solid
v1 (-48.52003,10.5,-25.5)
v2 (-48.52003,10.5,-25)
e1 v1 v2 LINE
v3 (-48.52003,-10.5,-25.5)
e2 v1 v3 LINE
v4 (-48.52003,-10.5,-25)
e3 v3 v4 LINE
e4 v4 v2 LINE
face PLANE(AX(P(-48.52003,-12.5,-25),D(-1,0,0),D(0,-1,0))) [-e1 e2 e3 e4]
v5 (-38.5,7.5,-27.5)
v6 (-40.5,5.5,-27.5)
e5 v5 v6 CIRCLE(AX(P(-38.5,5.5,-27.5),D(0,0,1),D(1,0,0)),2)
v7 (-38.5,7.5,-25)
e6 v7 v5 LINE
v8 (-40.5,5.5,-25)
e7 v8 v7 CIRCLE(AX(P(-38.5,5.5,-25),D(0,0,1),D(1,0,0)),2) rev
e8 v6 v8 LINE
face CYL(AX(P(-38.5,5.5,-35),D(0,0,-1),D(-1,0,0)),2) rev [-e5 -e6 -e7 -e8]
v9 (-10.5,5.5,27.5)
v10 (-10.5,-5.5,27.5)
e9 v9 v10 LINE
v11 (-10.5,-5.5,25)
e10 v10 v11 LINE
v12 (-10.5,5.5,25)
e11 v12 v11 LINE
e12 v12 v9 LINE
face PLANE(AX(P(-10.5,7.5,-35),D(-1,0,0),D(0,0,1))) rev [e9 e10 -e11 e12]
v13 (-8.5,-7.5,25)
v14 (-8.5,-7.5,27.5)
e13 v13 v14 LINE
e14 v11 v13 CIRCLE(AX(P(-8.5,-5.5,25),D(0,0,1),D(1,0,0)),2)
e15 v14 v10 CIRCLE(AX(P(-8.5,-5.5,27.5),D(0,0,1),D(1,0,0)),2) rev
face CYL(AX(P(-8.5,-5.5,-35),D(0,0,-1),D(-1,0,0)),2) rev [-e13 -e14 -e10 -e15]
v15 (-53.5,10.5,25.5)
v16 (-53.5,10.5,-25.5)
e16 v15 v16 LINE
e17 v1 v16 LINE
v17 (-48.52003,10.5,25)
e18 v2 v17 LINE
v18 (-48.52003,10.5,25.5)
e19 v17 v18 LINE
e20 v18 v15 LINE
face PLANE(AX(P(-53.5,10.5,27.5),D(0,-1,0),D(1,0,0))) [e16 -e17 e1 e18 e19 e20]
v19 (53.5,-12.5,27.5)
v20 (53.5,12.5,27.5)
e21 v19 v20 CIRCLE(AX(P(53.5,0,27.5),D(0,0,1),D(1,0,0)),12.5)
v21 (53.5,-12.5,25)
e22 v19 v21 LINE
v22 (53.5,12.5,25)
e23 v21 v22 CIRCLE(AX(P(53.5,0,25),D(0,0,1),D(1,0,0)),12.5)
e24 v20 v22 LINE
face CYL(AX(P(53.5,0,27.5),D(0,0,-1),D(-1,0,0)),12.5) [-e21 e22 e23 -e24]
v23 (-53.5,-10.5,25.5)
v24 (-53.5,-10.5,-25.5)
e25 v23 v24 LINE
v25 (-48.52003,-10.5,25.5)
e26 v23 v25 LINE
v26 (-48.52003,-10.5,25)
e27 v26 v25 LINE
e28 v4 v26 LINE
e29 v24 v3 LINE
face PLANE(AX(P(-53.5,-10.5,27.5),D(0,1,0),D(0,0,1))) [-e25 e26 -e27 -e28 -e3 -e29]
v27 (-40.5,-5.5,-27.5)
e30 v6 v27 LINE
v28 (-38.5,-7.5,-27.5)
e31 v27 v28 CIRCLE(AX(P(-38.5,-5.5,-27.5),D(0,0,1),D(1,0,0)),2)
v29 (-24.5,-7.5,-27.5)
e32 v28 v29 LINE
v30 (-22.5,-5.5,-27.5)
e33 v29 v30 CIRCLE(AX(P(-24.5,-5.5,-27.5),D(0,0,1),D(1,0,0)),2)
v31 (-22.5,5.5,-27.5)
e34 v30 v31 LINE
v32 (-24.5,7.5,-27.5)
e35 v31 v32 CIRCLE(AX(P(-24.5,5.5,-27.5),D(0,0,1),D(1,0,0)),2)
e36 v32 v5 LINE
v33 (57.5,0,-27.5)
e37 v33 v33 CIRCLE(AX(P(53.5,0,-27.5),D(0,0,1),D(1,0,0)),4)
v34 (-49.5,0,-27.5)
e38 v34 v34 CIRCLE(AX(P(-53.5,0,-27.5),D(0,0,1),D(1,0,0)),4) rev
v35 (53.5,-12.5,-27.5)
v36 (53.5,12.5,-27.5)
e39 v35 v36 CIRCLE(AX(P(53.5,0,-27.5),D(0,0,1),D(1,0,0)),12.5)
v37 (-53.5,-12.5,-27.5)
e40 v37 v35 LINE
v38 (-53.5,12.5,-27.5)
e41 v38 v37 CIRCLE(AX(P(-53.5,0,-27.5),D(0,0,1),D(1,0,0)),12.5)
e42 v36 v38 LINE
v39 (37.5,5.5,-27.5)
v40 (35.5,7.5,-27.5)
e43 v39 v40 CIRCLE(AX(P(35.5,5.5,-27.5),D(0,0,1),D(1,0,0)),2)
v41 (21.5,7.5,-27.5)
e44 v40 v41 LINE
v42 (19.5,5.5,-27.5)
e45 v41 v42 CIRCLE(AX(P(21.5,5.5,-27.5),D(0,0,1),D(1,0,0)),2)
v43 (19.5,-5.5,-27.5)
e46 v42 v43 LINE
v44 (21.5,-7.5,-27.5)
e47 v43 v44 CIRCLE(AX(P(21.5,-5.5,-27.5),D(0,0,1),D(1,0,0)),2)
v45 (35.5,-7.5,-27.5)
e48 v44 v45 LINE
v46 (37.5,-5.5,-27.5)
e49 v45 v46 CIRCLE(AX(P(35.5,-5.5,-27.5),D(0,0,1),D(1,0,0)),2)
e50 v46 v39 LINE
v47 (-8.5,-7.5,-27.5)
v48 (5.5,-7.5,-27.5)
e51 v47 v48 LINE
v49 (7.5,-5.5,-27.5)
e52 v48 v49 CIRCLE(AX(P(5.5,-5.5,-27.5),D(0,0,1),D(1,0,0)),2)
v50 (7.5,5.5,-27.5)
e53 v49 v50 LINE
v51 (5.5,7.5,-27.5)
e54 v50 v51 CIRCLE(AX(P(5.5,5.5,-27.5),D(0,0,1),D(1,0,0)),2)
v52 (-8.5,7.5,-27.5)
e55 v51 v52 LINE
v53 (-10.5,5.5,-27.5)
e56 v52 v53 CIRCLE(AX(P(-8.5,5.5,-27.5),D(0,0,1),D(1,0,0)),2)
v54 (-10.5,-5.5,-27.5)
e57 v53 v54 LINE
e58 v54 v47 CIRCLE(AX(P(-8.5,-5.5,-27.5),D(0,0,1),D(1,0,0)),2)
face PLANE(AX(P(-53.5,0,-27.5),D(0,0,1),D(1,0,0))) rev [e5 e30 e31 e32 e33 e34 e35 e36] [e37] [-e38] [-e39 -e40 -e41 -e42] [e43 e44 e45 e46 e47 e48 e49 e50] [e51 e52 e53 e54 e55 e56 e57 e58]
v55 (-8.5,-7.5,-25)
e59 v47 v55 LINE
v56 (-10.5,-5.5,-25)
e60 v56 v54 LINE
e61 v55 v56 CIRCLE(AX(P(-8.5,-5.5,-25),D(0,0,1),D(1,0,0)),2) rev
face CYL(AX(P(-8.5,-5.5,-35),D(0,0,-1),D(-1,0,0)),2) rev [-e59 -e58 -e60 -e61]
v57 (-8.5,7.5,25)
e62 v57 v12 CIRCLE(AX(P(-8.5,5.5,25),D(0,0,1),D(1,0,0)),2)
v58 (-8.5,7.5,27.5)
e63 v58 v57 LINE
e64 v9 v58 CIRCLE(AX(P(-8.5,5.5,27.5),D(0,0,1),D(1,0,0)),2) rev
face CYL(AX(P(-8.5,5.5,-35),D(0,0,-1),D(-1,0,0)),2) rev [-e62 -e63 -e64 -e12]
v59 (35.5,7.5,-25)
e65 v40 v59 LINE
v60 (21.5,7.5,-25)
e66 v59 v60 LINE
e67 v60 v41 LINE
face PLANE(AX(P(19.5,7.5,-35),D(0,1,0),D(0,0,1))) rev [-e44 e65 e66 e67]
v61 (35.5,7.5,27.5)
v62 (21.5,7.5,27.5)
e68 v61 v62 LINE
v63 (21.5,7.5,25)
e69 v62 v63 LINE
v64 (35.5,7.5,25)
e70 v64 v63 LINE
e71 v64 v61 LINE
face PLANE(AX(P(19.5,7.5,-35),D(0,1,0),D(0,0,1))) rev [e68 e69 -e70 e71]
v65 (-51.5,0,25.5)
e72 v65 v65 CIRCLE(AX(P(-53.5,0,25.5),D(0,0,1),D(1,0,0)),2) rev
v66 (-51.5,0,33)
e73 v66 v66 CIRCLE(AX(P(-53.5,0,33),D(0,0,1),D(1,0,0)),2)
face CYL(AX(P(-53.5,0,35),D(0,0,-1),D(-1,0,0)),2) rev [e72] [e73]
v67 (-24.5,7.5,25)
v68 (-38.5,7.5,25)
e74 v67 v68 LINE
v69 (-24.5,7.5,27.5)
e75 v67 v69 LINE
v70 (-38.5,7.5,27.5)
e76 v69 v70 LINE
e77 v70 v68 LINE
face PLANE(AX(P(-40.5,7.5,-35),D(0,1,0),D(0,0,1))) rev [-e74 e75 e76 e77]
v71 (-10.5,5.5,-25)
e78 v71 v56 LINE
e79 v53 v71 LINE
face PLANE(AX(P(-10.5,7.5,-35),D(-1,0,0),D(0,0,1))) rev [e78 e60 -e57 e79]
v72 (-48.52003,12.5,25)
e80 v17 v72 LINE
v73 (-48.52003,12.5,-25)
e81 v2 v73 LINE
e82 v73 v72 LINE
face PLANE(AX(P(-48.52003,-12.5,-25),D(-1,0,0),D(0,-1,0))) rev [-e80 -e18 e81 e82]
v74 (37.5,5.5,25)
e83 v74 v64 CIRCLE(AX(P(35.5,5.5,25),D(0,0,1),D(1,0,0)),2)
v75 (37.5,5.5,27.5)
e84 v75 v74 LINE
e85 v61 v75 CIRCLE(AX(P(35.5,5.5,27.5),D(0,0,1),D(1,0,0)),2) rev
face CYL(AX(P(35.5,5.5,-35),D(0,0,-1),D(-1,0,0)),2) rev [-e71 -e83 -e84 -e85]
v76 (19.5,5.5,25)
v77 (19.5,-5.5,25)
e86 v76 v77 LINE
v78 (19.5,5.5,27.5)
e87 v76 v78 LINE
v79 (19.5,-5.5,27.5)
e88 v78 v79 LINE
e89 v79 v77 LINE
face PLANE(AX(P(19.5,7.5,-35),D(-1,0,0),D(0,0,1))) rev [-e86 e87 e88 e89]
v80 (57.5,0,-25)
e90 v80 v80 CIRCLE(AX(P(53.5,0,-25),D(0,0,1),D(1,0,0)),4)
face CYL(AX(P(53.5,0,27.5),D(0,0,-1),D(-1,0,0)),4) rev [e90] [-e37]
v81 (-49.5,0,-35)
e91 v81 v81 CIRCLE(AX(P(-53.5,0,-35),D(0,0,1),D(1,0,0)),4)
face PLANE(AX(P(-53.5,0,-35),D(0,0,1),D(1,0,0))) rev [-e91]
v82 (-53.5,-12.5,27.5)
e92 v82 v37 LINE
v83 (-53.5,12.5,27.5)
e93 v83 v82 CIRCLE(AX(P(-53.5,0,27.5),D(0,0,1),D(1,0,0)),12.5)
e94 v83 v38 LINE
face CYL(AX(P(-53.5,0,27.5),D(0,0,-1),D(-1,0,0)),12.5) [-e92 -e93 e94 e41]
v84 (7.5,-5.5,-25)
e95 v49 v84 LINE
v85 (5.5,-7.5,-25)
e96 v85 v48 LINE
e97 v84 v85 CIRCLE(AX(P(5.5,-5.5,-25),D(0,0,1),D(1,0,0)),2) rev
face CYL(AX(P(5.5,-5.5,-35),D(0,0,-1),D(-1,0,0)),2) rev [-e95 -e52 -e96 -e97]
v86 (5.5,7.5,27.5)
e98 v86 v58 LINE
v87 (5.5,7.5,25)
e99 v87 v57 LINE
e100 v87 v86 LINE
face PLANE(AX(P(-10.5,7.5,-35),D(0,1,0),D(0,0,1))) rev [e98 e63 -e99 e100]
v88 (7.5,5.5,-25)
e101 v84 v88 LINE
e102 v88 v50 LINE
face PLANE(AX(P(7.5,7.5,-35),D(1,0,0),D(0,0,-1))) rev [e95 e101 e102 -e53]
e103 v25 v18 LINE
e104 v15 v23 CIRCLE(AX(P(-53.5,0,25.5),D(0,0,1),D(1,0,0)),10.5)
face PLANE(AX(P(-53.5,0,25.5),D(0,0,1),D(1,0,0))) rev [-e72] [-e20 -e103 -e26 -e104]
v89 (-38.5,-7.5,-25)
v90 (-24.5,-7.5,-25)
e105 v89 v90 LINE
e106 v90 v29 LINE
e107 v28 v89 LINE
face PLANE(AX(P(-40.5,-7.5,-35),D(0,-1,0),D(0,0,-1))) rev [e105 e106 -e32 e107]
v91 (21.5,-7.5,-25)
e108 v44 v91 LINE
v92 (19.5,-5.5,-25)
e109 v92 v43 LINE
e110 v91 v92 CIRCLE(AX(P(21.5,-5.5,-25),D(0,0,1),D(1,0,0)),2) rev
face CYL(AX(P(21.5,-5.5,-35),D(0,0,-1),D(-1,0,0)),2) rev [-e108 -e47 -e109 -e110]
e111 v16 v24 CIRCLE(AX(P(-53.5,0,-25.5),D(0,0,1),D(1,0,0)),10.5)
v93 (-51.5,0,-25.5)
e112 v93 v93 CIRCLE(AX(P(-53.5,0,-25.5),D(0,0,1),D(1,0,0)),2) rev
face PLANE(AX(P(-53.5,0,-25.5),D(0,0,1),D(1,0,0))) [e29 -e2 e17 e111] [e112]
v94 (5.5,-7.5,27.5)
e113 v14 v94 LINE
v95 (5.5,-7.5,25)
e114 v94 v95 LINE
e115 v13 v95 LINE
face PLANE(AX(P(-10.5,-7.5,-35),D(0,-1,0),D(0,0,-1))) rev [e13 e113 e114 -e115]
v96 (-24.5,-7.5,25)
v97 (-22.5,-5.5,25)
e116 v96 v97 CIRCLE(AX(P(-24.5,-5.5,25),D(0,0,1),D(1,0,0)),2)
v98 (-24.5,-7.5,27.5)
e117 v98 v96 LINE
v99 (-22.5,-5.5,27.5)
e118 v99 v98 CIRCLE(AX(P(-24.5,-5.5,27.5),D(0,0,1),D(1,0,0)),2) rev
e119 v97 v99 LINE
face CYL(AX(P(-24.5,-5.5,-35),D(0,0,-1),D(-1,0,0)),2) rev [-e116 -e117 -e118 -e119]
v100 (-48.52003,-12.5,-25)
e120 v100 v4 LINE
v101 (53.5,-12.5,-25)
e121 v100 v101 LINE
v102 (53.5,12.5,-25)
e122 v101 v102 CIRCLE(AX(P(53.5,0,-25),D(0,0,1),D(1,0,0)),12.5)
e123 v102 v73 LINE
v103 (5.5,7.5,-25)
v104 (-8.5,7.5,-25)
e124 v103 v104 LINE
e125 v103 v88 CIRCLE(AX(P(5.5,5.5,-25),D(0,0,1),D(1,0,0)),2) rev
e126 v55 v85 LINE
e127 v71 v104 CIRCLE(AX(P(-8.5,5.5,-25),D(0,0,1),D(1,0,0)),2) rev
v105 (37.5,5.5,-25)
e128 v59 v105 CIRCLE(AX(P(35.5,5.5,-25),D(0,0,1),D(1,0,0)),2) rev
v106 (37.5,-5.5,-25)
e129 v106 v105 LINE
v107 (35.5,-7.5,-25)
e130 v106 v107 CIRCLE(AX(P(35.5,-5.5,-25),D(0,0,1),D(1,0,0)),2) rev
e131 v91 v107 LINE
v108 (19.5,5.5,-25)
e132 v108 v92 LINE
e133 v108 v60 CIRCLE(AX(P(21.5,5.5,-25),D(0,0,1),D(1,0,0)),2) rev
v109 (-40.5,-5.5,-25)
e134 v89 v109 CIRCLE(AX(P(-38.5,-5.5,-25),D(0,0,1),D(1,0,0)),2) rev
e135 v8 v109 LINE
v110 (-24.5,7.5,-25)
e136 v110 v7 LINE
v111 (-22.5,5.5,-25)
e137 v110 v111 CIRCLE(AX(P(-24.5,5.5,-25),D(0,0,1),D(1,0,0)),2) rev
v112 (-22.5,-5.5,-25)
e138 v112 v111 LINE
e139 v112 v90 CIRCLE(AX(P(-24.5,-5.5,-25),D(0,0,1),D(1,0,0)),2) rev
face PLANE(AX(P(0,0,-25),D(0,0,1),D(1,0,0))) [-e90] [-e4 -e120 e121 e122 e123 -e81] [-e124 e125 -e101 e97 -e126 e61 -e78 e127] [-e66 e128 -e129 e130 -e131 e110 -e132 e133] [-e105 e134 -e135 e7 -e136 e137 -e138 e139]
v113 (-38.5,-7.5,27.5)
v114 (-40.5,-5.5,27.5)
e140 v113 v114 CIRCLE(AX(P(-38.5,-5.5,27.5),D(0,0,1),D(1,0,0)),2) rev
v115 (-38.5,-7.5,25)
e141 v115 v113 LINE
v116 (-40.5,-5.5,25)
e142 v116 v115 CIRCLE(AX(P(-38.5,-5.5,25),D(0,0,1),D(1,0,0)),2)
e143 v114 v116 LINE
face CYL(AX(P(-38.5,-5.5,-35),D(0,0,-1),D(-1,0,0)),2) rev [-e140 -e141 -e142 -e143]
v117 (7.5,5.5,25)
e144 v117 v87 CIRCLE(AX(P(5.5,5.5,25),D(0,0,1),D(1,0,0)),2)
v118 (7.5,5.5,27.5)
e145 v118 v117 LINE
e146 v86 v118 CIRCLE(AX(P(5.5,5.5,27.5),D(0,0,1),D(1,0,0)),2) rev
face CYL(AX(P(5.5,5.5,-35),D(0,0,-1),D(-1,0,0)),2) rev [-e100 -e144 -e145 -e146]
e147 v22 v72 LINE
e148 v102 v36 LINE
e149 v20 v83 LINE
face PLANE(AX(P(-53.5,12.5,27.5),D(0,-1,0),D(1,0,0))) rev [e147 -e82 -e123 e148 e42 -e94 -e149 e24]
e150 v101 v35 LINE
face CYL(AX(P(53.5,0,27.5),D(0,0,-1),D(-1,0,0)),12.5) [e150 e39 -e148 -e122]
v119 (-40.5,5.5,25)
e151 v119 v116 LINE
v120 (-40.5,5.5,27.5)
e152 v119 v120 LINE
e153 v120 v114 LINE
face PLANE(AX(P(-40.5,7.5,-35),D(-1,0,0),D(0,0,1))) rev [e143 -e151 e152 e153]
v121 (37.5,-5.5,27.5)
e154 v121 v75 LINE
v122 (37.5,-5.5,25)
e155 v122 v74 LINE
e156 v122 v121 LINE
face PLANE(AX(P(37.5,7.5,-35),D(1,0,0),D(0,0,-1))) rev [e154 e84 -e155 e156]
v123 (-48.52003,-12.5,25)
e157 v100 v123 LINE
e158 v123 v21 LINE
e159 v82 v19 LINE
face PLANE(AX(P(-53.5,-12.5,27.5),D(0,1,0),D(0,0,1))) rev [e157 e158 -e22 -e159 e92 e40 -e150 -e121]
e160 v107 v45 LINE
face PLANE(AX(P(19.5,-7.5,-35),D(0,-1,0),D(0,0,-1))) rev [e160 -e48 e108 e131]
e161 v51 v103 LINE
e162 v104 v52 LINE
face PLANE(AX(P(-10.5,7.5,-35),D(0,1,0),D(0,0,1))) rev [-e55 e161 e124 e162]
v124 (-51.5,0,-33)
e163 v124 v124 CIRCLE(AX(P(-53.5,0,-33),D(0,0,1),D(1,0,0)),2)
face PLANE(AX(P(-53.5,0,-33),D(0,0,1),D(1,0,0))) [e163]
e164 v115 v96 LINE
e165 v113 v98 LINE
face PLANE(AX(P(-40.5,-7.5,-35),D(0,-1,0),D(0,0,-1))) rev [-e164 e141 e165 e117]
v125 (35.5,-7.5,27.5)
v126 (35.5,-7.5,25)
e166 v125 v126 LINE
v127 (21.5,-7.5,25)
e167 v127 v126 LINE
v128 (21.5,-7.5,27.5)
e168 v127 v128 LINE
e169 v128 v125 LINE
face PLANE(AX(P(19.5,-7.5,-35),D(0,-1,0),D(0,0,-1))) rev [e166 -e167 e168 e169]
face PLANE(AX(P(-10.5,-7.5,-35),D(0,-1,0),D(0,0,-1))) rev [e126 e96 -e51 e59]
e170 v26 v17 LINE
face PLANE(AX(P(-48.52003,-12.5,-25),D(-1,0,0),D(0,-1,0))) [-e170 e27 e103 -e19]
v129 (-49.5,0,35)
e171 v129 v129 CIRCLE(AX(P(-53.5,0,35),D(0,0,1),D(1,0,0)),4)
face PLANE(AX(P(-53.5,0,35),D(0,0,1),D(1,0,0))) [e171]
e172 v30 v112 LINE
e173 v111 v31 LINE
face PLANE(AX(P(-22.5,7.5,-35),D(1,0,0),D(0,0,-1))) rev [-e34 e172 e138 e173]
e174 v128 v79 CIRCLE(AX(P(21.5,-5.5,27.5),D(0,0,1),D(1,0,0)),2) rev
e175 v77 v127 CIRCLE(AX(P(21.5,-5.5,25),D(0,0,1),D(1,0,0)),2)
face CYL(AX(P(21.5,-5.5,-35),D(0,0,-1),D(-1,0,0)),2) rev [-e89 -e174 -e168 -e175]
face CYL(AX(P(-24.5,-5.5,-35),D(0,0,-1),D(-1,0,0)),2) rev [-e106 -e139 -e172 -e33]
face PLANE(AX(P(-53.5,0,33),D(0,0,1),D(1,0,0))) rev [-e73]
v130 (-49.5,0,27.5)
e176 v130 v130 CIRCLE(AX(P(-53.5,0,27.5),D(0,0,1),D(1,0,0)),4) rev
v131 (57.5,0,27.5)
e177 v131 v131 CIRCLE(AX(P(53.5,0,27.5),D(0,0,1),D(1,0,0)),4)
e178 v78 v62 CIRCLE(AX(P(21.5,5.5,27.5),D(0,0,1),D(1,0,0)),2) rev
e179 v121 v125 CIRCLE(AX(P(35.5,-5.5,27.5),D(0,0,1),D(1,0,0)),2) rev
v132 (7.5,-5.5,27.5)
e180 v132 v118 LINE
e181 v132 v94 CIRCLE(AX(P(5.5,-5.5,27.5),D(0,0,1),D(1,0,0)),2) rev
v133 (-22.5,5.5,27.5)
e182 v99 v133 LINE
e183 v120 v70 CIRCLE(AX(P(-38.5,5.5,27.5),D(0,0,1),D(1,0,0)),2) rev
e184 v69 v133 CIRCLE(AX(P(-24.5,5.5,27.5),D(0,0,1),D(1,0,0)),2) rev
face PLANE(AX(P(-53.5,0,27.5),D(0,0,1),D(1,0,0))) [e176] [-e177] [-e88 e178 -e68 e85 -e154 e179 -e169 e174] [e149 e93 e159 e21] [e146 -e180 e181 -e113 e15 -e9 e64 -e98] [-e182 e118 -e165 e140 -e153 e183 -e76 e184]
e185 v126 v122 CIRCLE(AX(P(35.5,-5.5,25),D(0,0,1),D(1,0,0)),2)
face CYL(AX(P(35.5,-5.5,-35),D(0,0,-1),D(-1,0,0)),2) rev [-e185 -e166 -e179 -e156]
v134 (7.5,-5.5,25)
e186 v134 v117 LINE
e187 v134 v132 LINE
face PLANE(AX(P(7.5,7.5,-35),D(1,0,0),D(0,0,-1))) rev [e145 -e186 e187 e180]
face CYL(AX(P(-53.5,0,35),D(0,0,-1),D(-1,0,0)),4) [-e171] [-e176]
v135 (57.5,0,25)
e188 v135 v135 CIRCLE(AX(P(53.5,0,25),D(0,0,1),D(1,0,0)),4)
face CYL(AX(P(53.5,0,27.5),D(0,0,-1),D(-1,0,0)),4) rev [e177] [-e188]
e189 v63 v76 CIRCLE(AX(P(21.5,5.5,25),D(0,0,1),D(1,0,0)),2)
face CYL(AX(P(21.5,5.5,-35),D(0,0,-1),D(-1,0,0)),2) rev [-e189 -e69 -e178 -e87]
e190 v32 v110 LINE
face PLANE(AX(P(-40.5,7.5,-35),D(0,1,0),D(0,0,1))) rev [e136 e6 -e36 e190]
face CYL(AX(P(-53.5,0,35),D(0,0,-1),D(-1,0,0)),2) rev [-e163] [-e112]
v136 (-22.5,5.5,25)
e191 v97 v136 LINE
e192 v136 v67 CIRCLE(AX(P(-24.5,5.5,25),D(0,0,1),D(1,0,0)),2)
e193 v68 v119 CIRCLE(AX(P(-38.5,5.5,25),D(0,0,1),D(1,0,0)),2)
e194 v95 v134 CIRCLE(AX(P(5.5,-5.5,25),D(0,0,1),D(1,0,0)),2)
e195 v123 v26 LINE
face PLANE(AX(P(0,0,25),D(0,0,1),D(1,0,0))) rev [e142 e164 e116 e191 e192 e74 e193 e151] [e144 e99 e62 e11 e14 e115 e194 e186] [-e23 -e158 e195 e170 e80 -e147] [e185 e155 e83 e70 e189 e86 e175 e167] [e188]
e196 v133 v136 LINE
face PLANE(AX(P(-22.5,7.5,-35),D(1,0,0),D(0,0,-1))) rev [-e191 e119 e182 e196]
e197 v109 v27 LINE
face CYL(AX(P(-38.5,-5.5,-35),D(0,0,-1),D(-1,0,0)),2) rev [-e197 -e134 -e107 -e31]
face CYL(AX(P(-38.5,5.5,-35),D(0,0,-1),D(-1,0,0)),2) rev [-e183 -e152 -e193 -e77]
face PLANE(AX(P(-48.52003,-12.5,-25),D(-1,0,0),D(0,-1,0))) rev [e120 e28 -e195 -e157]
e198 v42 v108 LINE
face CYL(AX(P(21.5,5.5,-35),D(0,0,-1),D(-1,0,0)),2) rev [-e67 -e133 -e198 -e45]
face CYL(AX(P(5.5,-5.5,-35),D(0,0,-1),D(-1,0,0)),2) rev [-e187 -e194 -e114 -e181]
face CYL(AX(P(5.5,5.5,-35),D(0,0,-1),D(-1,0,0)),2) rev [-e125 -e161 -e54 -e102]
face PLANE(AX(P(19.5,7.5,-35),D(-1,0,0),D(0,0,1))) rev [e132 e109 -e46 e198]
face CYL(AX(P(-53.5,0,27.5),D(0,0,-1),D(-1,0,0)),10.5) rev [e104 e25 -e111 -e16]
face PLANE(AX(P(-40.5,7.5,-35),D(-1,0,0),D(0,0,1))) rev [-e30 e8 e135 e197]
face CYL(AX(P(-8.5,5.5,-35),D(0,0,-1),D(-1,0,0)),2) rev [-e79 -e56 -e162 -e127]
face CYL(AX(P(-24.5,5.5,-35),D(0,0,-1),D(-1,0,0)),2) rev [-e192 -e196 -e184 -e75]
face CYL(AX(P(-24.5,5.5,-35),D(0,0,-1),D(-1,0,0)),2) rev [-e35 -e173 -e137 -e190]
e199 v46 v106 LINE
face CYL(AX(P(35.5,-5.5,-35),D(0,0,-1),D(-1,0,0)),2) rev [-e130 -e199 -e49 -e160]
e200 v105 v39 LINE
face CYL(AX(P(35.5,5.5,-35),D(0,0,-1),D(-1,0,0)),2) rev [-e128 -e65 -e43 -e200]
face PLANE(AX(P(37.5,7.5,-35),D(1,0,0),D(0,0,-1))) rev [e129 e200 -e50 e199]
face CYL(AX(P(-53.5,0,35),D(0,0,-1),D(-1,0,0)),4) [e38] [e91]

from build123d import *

# Parameters (mm, degrees)
SKETCH1_R              = 4
BOSS_EXTRUDE1_DEPTH    = 27.5
SKETCH2_W              = 61.091432286
SKETCH2_H              = 28.689736928
CUT_EXTRUDE1_DEPTH     = 25
SKETCH3_R              = 4
BOSS_EXTRUDE2_DEPTH    = 35
SKETCH4_W              = 71.474314091
SKETCH4_H              = 50
CUT_EXTRUDE2_DEPTH     = 79.778169565
SHELL1_START           = -25.5
SHELL1_DEPTH           = 51
SHELL1_START_2         = -33
SHELL1_2_OUTLINE_R     = 2
SHELL1_2_DEPTH         = 66
SKETCH5_W              = 18
SKETCH5_H              = 15
CUT_EXTRUDE3_DEPTH     = 92.752384165
FILLET1_R              = 2
LPATTERN1_COUNT        = 3
LPATTERN1_PITCH        = 30
FILLET1_OF_LPATTERN1_R = 2


# Read off the part's stored shape, not the designer's step: Shell1
with BuildPart() as part:
    # Sketch1 → Boss-Extrude1 (new, symmetric)
    with BuildSketch(Plane.XY):
        with BuildLine():
            Line((-53.5, 12.5), (53.5, 12.5))
            ThreePointArc((53.5, 12.5), (66, 0), (53.5, -12.5))
            Line((53.5, -12.5), (-53.5, -12.5))
            ThreePointArc((-53.5, -12.5), (-66, 0), (-53.5, 12.5))
        make_face()
        with Locations((53.5, 0)):
            Circle(SKETCH1_R, mode=Mode.SUBTRACT)
    extrude(amount=BOSS_EXTRUDE1_DEPTH, both=True)

    # Sketch2 → Cut-Extrude1 (cut, symmetric)
    with BuildSketch(Plane.XY):
        with Locations((53.5, 0)):
            Rectangle(SKETCH2_W, SKETCH2_H)
    extrude(amount=CUT_EXTRUDE1_DEPTH, both=True, mode=Mode.SUBTRACT)

    # Sketch3 → Boss-Extrude2 (add, symmetric)
    with BuildSketch(Plane.XY):
        with Locations((-53.5, 0)):
            Circle(SKETCH3_R)
    extrude(amount=BOSS_EXTRUDE2_DEPTH, both=True)

    # Sketch4 → Cut-Extrude2 (cut, through all)
    with BuildSketch(Plane(origin=(0, 12.5, 0), x_dir=(1, 0, 0), z_dir=(0, 1, 0))):
        with Locations((-12.782873189, 0)):
            Rectangle(SKETCH4_W, SKETCH4_H)
    extrude(amount=-CUT_EXTRUDE2_DEPTH, mode=Mode.SUBTRACT)

    # Shell1 outline → Shell1 (cut)
    with BuildSketch(Plane.XY.offset(SHELL1_START)):
        with BuildLine():
            Line((-48.520030234, -10.5), (-48.520030234, 10.5))
            Line((-48.520030234, 10.5), (-53.5, 10.5))
            ThreePointArc((-53.5, 10.5), (-64, 0), (-53.5, -10.5))
            Line((-53.5, -10.5), (-48.520030234, -10.5))
        make_face()
    extrude(amount=SHELL1_DEPTH, mode=Mode.SUBTRACT)

    # Shell1 2 outline → Shell1 2 (cut)
    with BuildSketch(Plane.XY.offset(SHELL1_START_2)):
        with Locations((-53.5, 0)):
            Circle(SHELL1_2_OUTLINE_R)
    extrude(amount=SHELL1_2_DEPTH, mode=Mode.SUBTRACT)

    # Sketch5 → Cut-Extrude3 (cut, through all)
    with BuildSketch(Plane.XY.offset(27.5)):
        with Locations((-31.5, 0)):
            Rectangle(SKETCH5_W, SKETCH5_H)
    cut_extrude3 = extrude(amount=-CUT_EXTRUDE3_DEPTH, mode=Mode.SUBTRACT)

    # Fillet1
    fillet1_edges = [part.edges().sort_by_distance(p)[0] for p in [
        (-40.5, -7.5, -26.25),
        (-40.5, -7.5, 26.25),
        (-40.5, 7.5, -26.25),
        (-40.5, 7.5, 26.25),
        (-22.5, 7.5, -26.25),
        (-22.5, 7.5, 26.25),
        (-22.5, -7.5, -26.25),
        (-22.5, -7.5, 26.25),
    ]]
    fillet(fillet1_edges, radius=FILLET1_R)

    # LPattern1: Cut-Extrude3 ×3
    with Locations(*[(i * LPATTERN1_PITCH, 0, 0) for i in range(1, LPATTERN1_COUNT)]):
        add(cut_extrude3, mode=Mode.SUBTRACT)

    # Fillet1 of LPattern1
    fillet1_of_lpattern1_edges = [part.edges().sort_by_distance(p)[0] for p in [
        (-10.5, -7.5, -26.25),
        (-10.5, -7.5, 26.25),
        (-10.5, 7.5, -26.25),
        (-10.5, 7.5, 26.25),
        (7.5, 7.5, -26.25),
        (7.5, 7.5, 26.25),
        (7.5, -7.5, -26.25),
        (7.5, -7.5, 26.25),
        (19.5, -7.5, -26.25),
        (19.5, -7.5, 26.25),
        (19.5, 7.5, -26.25),
        (19.5, 7.5, 26.25),
        (37.5, 7.5, -26.25),
        (37.5, 7.5, 26.25),
        (37.5, -7.5, -26.25),
        (37.5, -7.5, 26.25),
    ]]
    fillet(fillet1_of_lpattern1_edges, radius=FILLET1_OF_LPATTERN1_R)


solid = part.part
